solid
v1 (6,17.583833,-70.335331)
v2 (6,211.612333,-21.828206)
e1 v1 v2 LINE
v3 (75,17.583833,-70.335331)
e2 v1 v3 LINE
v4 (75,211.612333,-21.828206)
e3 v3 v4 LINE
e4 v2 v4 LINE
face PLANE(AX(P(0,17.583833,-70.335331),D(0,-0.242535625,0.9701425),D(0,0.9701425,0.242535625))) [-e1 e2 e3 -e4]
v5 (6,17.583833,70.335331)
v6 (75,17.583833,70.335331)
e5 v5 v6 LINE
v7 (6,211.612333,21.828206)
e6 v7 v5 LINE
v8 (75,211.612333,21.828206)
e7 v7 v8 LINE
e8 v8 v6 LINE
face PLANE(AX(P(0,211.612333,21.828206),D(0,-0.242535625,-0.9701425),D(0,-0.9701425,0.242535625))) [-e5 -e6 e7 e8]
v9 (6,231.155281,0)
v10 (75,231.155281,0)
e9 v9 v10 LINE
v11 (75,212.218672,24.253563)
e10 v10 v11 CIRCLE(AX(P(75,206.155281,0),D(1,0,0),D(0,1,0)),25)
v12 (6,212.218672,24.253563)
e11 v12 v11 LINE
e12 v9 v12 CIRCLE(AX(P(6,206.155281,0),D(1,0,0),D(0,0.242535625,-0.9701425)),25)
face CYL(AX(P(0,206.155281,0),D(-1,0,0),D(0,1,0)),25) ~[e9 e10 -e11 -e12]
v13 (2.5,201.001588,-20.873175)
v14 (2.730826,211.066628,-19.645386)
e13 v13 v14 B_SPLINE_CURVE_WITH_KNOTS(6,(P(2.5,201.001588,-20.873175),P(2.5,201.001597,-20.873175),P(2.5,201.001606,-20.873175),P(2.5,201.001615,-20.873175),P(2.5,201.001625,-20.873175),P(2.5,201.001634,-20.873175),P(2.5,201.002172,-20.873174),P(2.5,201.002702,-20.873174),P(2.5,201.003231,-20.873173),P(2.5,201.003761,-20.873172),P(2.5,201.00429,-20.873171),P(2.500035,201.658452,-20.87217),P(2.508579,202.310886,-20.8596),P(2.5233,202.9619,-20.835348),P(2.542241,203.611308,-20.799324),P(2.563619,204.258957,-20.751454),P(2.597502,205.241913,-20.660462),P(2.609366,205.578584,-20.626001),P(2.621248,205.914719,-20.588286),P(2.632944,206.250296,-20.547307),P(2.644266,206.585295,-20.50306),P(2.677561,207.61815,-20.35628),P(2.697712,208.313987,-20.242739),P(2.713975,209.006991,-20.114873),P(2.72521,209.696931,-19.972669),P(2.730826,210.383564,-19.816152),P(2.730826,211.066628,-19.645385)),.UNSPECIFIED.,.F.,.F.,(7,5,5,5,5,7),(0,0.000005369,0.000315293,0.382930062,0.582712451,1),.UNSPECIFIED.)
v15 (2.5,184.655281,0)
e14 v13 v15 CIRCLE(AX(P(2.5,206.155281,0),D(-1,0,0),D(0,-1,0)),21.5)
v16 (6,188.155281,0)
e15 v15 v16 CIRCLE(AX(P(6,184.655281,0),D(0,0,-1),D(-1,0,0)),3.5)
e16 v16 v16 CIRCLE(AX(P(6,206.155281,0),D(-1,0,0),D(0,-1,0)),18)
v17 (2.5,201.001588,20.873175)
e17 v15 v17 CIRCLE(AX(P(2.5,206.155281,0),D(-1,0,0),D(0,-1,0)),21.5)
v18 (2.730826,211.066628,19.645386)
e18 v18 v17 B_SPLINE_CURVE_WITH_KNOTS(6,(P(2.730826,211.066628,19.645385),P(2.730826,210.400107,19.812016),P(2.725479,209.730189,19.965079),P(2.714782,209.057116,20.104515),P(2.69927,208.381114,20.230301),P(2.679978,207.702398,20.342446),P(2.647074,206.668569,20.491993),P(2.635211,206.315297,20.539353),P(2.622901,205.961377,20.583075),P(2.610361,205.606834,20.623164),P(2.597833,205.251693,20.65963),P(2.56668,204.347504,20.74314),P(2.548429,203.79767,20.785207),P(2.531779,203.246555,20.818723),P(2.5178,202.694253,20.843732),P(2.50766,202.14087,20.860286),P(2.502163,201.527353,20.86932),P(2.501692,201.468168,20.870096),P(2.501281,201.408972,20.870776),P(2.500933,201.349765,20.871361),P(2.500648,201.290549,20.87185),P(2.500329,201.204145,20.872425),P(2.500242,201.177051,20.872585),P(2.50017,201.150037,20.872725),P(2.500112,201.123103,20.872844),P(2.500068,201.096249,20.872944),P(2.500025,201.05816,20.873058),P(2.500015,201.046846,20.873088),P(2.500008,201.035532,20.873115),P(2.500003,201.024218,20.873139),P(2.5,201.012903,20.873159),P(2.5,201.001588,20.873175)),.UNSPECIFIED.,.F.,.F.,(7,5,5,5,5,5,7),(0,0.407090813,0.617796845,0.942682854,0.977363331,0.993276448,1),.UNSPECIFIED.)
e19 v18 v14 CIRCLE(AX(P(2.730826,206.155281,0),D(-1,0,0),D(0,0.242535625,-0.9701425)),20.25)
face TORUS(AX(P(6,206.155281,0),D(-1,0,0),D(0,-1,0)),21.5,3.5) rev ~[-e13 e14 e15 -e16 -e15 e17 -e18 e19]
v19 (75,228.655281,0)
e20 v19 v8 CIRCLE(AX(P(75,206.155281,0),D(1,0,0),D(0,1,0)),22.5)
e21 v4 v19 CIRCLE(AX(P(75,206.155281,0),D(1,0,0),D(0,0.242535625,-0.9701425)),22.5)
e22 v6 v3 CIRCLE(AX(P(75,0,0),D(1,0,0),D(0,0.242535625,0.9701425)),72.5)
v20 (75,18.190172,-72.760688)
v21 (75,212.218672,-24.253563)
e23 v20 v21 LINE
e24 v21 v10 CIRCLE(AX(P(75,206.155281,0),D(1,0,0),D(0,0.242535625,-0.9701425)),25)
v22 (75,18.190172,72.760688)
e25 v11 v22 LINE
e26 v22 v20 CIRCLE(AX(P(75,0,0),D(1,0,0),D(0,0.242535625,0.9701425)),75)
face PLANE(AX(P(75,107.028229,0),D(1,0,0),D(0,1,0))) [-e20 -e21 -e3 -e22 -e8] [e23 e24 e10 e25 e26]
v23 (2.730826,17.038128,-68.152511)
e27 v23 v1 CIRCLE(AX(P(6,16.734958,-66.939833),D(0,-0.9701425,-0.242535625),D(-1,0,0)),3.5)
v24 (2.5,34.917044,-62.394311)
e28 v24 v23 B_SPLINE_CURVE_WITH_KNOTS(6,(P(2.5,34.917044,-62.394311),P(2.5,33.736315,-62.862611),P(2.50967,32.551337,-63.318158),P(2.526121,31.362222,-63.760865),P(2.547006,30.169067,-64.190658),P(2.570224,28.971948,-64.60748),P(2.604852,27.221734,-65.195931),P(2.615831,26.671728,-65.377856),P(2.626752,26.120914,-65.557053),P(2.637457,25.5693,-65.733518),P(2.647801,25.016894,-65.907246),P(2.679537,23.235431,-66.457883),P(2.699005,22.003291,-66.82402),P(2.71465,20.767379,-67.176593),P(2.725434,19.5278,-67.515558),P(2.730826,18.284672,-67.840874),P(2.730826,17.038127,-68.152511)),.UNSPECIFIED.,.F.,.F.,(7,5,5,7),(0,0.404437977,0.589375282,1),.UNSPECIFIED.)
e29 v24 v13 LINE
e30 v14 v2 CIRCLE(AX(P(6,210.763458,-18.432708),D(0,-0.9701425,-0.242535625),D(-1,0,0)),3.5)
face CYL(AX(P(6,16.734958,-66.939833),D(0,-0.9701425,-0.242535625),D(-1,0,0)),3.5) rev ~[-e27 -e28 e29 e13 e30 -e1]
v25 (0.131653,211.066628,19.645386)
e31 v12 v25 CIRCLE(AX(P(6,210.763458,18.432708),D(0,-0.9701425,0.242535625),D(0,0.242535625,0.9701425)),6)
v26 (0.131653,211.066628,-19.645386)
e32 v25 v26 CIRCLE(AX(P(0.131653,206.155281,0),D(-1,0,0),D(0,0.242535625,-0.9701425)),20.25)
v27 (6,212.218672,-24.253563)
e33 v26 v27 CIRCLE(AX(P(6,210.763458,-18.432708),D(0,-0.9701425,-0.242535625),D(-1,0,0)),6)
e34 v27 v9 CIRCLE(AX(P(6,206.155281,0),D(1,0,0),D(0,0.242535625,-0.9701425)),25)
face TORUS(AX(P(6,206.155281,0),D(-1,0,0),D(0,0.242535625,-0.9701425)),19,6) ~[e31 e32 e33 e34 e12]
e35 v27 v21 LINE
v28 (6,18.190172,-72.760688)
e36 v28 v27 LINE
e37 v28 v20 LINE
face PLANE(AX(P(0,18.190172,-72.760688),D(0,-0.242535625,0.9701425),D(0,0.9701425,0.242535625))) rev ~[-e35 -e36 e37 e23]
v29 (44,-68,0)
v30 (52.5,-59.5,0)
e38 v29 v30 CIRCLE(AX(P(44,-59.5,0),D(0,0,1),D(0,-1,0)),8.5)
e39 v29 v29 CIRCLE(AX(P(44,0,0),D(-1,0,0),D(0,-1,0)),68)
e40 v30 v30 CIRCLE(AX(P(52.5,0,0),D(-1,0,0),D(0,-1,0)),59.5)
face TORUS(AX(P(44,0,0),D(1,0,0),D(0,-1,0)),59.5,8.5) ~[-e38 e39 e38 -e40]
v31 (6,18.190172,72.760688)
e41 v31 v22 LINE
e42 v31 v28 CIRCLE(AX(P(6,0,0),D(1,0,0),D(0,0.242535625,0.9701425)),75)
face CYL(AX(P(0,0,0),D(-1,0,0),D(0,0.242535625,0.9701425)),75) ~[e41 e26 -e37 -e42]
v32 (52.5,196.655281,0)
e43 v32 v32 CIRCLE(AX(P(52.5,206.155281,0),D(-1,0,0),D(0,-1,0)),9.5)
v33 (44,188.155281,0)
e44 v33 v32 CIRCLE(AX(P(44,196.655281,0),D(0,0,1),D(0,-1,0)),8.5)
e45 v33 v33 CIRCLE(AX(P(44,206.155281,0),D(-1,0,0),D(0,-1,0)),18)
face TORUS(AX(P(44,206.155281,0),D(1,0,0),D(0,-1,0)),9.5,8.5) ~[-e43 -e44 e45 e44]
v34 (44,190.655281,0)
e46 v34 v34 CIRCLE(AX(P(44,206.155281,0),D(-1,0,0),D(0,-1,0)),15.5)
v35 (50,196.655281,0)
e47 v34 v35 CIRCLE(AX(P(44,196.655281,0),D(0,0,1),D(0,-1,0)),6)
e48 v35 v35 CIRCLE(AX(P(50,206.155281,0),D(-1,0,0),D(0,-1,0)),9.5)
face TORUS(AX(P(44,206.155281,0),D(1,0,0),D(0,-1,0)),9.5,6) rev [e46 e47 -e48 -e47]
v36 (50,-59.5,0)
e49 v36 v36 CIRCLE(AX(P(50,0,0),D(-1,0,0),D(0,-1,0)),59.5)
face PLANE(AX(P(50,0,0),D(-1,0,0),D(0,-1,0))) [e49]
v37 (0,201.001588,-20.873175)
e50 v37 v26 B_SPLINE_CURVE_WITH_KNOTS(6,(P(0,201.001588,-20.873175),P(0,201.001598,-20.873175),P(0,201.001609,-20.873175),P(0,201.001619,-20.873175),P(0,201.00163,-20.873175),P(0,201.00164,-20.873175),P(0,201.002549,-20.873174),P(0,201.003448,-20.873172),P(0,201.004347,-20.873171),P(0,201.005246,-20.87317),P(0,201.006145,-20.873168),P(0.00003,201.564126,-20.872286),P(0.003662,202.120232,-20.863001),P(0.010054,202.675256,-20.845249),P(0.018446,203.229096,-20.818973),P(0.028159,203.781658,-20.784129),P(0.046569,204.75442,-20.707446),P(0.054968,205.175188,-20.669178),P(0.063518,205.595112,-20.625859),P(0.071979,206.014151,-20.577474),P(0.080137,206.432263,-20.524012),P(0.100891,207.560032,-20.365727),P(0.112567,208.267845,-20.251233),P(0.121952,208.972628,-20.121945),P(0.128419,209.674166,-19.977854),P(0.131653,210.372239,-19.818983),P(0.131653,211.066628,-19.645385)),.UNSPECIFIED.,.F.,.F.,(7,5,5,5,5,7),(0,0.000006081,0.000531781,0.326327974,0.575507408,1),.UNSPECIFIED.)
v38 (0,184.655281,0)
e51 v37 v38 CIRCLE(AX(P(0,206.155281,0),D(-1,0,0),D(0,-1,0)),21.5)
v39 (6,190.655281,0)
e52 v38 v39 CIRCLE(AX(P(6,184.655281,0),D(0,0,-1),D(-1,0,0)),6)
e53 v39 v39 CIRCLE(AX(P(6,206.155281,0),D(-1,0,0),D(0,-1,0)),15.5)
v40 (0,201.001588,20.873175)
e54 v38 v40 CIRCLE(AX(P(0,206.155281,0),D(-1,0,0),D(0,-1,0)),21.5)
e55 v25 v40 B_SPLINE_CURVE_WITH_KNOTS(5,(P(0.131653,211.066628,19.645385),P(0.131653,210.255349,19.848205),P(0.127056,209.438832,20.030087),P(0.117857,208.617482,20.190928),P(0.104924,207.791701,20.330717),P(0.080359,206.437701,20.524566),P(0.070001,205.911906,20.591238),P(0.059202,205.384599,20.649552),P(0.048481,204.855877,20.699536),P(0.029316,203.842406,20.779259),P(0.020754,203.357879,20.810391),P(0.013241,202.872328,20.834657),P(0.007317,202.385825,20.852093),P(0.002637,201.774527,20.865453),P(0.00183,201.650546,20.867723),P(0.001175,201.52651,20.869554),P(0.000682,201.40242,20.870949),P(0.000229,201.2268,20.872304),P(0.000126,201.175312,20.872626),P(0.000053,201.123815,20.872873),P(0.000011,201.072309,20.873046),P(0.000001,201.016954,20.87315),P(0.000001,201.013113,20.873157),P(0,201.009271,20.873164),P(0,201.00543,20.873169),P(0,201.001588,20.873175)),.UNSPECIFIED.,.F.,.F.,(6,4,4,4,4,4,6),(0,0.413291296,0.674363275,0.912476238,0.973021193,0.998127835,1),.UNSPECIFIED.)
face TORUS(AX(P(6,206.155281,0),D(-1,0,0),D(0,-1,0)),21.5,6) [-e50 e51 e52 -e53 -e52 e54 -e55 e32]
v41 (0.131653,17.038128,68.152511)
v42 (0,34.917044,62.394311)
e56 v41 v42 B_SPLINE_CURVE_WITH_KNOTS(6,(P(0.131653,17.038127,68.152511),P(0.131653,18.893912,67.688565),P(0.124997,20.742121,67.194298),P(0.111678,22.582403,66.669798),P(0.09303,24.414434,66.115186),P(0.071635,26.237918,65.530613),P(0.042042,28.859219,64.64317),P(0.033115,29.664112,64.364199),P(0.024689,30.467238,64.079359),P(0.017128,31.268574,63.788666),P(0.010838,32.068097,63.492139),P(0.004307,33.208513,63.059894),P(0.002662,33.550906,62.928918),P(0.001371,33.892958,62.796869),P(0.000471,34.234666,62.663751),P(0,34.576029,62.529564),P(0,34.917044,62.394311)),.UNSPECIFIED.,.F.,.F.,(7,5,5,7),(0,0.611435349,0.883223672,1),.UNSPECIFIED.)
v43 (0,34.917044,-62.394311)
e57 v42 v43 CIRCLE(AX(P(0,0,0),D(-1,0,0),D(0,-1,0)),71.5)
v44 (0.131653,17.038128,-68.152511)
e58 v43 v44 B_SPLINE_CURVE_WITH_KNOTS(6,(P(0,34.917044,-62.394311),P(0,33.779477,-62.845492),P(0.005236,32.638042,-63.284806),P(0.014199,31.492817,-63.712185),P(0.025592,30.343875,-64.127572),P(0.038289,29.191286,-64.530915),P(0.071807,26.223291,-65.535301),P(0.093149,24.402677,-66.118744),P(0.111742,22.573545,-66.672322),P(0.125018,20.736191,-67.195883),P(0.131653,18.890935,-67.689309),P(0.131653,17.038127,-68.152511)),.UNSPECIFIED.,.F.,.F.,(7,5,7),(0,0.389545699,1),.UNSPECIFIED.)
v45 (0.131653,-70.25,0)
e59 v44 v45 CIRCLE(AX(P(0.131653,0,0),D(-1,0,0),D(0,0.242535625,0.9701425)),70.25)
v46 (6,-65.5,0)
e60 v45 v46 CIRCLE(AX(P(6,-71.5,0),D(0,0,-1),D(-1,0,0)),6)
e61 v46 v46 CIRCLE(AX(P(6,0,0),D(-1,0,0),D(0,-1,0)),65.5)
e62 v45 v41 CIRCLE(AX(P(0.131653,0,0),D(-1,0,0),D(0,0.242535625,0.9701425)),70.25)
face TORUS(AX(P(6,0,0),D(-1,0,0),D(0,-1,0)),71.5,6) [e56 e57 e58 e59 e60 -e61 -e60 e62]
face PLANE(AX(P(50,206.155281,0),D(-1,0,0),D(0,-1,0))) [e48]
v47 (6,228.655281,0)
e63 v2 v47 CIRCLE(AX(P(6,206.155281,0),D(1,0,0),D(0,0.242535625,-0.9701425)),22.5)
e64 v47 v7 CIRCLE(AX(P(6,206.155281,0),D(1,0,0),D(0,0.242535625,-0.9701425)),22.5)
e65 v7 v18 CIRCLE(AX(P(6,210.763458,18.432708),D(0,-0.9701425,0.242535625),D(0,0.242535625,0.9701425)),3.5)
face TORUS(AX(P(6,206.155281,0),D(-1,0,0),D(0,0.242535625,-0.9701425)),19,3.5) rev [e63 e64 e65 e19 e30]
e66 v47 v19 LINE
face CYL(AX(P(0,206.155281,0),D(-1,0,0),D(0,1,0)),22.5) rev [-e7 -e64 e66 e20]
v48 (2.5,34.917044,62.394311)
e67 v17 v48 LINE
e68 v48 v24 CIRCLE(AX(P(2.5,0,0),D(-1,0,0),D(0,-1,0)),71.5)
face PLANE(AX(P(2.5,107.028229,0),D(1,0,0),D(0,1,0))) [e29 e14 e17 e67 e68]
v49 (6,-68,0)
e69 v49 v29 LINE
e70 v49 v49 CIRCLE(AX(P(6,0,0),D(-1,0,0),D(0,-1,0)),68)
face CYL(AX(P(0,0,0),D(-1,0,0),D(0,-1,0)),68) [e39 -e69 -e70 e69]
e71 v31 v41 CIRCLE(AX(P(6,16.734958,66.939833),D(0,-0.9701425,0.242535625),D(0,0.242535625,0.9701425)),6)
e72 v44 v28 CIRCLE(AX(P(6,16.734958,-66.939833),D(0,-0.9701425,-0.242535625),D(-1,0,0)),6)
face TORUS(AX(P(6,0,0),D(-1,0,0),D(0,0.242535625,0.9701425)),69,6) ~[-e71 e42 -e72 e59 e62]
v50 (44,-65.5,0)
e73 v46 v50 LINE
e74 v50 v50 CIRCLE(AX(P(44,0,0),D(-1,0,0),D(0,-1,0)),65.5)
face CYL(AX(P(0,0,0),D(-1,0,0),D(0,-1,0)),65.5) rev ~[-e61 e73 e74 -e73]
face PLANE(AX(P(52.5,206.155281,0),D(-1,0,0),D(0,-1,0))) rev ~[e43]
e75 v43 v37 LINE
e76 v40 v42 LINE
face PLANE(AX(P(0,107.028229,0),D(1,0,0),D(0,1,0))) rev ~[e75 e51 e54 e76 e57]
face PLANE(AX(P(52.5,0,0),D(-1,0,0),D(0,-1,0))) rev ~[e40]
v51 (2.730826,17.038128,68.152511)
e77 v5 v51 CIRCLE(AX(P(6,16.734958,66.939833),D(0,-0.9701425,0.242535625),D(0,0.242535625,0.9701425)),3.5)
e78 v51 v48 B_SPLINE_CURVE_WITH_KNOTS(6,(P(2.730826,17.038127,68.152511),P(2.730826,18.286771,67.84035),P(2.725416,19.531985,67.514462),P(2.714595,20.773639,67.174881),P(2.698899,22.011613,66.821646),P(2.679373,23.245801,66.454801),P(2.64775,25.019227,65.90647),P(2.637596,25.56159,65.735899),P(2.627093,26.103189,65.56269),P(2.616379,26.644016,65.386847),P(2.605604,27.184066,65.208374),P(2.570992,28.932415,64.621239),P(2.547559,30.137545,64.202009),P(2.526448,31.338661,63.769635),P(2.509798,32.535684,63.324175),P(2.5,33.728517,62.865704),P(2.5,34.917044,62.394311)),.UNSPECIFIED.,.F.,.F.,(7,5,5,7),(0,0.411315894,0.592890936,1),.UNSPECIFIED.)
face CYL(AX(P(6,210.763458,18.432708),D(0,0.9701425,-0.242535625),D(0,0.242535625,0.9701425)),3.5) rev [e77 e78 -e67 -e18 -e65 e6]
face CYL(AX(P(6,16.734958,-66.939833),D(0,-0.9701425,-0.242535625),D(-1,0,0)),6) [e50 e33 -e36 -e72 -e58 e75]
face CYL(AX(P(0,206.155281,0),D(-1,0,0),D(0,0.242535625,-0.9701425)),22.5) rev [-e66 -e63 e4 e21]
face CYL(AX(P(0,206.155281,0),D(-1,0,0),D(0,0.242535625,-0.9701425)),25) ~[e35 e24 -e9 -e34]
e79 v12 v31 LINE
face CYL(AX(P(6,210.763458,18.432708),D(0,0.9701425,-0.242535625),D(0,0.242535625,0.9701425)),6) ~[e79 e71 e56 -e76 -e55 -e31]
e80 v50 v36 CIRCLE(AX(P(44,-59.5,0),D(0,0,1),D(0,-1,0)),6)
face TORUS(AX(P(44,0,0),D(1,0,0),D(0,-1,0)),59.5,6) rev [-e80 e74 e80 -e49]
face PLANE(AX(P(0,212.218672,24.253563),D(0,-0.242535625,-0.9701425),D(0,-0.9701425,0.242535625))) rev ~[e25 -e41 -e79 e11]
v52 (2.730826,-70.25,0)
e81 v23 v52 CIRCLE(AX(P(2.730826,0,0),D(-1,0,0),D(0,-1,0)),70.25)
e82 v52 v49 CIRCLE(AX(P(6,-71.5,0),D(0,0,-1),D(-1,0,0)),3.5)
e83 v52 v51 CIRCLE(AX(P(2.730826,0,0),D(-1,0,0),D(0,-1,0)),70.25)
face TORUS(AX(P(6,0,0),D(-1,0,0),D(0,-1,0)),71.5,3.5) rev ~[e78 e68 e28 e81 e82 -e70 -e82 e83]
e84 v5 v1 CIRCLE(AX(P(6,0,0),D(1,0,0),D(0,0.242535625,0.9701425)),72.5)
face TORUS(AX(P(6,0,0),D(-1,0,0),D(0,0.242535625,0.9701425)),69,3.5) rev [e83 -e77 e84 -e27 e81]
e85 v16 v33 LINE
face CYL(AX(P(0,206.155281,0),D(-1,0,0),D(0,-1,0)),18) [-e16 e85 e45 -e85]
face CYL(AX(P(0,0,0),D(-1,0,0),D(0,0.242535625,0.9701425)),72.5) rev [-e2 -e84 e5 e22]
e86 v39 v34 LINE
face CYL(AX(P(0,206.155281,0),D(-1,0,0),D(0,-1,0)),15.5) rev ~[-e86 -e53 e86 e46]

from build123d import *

# Parameters (mm, degrees)
F1_DEPTH     = 75
F2_R         = 65.5
F2_R_2       = 15.5
F3_DEPTH     = 50
F4_T5_DEPTH  = 200
F4_T7_DEPTH  = 200
F4_T10_ANGLE = 151.9275130641
F4_T12_ANGLE = 208.0724869359
F5_T         = -2.5


# Not quite as in the source:
# - a fillet or chamfer that OpenCascade refuses, or shapes differently, is made with other operations: its cross-section is extruded or revolved along the edge and cut away or added


with BuildPart() as f1:
    # F0 (on Right) → F1 (new body)
    with BuildSketch(Plane.YZ):
        with BuildLine():
            ThreePointArc((18.1901718777, 72.7606875109), (59.1154078512, 46.1559157052), (75, 0))
            ThreePointArc((75, 0), (59.1154078512, -46.1559157052), (18.1901718777, -72.7606875109))
            Line((18.1901718777, -72.7606875109), (212.2186719068, -24.2535625036))
            ThreePointArc((212.2186719068, -24.2535625036), (181.1552812809, 0), (212.2186719068, 24.2535625036))
            Line((212.2186719068, 24.2535625036), (18.1901718777, 72.7606875109))
        make_face()
        with BuildLine():
            ThreePointArc((18.1901718777, -72.7606875109), (59.1154078512, -46.1559157052), (75, 0))
            ThreePointArc((75, 0), (59.1154078512, 46.1559157052), (18.1901718777, 72.7606875109))
            ThreePointArc((18.1901718777, 72.7606875109), (-75, 0), (18.1901718777, -72.7606875109))
        make_face()
        with BuildLine():
            ThreePointArc((231.1552812809, 0), (225.8604172313, 15.3853052351), (212.2186719068, 24.2535625036))
            ThreePointArc((212.2186719068, 24.2535625036), (181.1552812809, 0), (212.2186719068, -24.2535625036))
            ThreePointArc((212.2186719068, -24.2535625036), (225.8604172313, -15.3853052351), (231.1552812809, 0))
        make_face()
    extrude(amount=F1_DEPTH)

    # F2 (on face) → F3 (cut)
    with BuildSketch(Plane(origin=(0, 0, 0), x_dir=(0, -1, 0), z_dir=(-1, 0, 0))):
        Circle(F2_R)
        with Locations((-206.1552812809, 0)):
            Circle(F2_R_2)
    extrude(amount=-F3_DEPTH, mode=Mode.SUBTRACT)

    # F4: fillet of radius 6 on 8 edges, made by hand

    # F4_s1 → F4_t2 (revolve)
    with BuildSketch(Plane.XY):
        with BuildLine():
            ThreePointArc((44, -65.5), (48.2426406871, -63.7426406871), (50, -59.5))
            Line((50, -59.5), (50.12, -59.5))
            Line((50.12, -59.5), (50.12, -65.62))
            Line((50.12, -65.62), (44, -65.62))
            Line((44, -65.62), (44, -65.5))
        make_face()
    revolve(axis=Axis((50, 0, 0), (-1, 0, 0)))

    # F4_s3 → F4_t4 (revolve)
    with BuildSketch(Plane.XY):
        with BuildLine():
            ThreePointArc((44, 190.6552812809), (48.2426406871, 192.4126405938), (50, 196.6552812809))
            Line((50, 196.6552812809), (50.12, 196.6552812809))
            Line((50.12, 196.6552812809), (50.12, 190.5352812809))
            Line((50.12, 190.5352812809), (44, 190.5352812809))
            Line((44, 190.5352812809), (44, 190.6552812809))
        make_face()
    revolve(axis=Axis((50, 206.1552812809, 0), (-1, 0, 0)))

    # F4_s6 → F4_t5 (cut)
    with BuildSketch(Plane(origin=(0, 194.0285000291, -48.5071250073), x_dir=(1, 0, 0), z_dir=(0, -0.9701425001, 0.242535625))):
        with BuildLine():
            ThreePointArc((6, 75), (1.7573593129, 73.2426406871), (0, 69))
            Line((0, 69), (-0.12, 69))
            Line((-0.12, 69), (-0.12, 75.12))
            Line((-0.12, 75.12), (6, 75.12))
            Line((6, 75.12), (6, 75))
        make_face()
    extrude(amount=F4_T5_DEPTH, mode=Mode.SUBTRACT)

    # F4_s8 → F4_t7 (cut)
    with BuildSketch(Plane(origin=(0, 0, 0), x_dir=(1, 0, 0), z_dir=(0, 0.9701425001, 0.242535625))):
        with BuildLine():
            ThreePointArc((0, 69), (1.7573593129, 73.2426406871), (6, 75))
            Line((6, 75), (6, 75.12))
            Line((6, 75.12), (-0.12, 75.12))
            Line((-0.12, 75.12), (-0.12, 69))
            Line((-0.12, 69), (0, 69))
        make_face()
    extrude(amount=F4_T7_DEPTH, mode=Mode.SUBTRACT)

    # F4_s9 → F4_t10 (revolve, cut)
    with BuildSketch(Plane(origin=(0, 194.0285000291, 48.5071250073), x_dir=(1, 0, 0), z_dir=(0, -0.9701425001, -0.242535625))):
        with BuildLine():
            ThreePointArc((6, -75), (1.7573593129, -73.2426406871), (0, -69))
            Line((0, -69), (-0.12, -69))
            Line((-0.12, -69), (-0.12, -75.12))
            Line((-0.12, -75.12), (6, -75.12))
            Line((6, -75.12), (6, -75))
        make_face()
    revolve(axis=Axis((0, 206.1552812809, 0), (1, 0, 0)), revolution_arc=F4_T10_ANGLE, mode=Mode.SUBTRACT)

    # F4_s11 → F4_t12 (revolve, cut)
    with BuildSketch(Plane(origin=(0, 0, 0), x_dir=(1, 0, 0), z_dir=(0, 0.9701425001, -0.242535625))):
        with BuildLine():
            ThreePointArc((6, -75), (1.7573593129, -73.2426406871), (0, -69))
            Line((0, -69), (-0.12, -69))
            Line((-0.12, -69), (-0.12, -75.12))
            Line((-0.12, -75.12), (6, -75.12))
            Line((6, -75.12), (6, -75))
        make_face()
    revolve(axis=Axis((0, 0, 0), (1, 0, 0)), revolution_arc=F4_T12_ANGLE, mode=Mode.SUBTRACT)

    # F4_s13 → F4_t14 (revolve, cut)
    with BuildSketch(Plane.XY):
        with BuildLine():
            ThreePointArc((0, -71.5), (1.7573593129, -67.2573593129), (6, -65.5))
            Line((6, -65.5), (6, -65.38))
            Line((6, -65.38), (-0.12, -65.38))
            Line((-0.12, -65.38), (-0.12, -71.5))
            Line((-0.12, -71.5), (0, -71.5))
        make_face()
    revolve(axis=Axis((0, 0, 0), (-1, 0, 0)), mode=Mode.SUBTRACT)

    # F4_s15 → F4_t16 (revolve, cut)
    with BuildSketch(Plane.XY):
        with BuildLine():
            ThreePointArc((0, 184.6552812809), (1.7573593129, 188.897921968), (6, 190.6552812809))
            Line((6, 190.6552812809), (6, 190.7752812809))
            Line((6, 190.7752812809), (-0.12, 190.7752812809))
            Line((-0.12, 190.7752812809), (-0.12, 184.6552812809))
            Line((-0.12, 184.6552812809), (0, 184.6552812809))
        make_face()
    revolve(axis=Axis((0, 206.1552812809, 0), (-1, 0, 0)), mode=Mode.SUBTRACT)

    # F5
    f5_openings = [f1.faces().sort_by_distance(p)[0] for p in [
        (75, 56.613425, 0),
    ]]
    offset(amount=F5_T, openings=f5_openings)


solid = f1.part
